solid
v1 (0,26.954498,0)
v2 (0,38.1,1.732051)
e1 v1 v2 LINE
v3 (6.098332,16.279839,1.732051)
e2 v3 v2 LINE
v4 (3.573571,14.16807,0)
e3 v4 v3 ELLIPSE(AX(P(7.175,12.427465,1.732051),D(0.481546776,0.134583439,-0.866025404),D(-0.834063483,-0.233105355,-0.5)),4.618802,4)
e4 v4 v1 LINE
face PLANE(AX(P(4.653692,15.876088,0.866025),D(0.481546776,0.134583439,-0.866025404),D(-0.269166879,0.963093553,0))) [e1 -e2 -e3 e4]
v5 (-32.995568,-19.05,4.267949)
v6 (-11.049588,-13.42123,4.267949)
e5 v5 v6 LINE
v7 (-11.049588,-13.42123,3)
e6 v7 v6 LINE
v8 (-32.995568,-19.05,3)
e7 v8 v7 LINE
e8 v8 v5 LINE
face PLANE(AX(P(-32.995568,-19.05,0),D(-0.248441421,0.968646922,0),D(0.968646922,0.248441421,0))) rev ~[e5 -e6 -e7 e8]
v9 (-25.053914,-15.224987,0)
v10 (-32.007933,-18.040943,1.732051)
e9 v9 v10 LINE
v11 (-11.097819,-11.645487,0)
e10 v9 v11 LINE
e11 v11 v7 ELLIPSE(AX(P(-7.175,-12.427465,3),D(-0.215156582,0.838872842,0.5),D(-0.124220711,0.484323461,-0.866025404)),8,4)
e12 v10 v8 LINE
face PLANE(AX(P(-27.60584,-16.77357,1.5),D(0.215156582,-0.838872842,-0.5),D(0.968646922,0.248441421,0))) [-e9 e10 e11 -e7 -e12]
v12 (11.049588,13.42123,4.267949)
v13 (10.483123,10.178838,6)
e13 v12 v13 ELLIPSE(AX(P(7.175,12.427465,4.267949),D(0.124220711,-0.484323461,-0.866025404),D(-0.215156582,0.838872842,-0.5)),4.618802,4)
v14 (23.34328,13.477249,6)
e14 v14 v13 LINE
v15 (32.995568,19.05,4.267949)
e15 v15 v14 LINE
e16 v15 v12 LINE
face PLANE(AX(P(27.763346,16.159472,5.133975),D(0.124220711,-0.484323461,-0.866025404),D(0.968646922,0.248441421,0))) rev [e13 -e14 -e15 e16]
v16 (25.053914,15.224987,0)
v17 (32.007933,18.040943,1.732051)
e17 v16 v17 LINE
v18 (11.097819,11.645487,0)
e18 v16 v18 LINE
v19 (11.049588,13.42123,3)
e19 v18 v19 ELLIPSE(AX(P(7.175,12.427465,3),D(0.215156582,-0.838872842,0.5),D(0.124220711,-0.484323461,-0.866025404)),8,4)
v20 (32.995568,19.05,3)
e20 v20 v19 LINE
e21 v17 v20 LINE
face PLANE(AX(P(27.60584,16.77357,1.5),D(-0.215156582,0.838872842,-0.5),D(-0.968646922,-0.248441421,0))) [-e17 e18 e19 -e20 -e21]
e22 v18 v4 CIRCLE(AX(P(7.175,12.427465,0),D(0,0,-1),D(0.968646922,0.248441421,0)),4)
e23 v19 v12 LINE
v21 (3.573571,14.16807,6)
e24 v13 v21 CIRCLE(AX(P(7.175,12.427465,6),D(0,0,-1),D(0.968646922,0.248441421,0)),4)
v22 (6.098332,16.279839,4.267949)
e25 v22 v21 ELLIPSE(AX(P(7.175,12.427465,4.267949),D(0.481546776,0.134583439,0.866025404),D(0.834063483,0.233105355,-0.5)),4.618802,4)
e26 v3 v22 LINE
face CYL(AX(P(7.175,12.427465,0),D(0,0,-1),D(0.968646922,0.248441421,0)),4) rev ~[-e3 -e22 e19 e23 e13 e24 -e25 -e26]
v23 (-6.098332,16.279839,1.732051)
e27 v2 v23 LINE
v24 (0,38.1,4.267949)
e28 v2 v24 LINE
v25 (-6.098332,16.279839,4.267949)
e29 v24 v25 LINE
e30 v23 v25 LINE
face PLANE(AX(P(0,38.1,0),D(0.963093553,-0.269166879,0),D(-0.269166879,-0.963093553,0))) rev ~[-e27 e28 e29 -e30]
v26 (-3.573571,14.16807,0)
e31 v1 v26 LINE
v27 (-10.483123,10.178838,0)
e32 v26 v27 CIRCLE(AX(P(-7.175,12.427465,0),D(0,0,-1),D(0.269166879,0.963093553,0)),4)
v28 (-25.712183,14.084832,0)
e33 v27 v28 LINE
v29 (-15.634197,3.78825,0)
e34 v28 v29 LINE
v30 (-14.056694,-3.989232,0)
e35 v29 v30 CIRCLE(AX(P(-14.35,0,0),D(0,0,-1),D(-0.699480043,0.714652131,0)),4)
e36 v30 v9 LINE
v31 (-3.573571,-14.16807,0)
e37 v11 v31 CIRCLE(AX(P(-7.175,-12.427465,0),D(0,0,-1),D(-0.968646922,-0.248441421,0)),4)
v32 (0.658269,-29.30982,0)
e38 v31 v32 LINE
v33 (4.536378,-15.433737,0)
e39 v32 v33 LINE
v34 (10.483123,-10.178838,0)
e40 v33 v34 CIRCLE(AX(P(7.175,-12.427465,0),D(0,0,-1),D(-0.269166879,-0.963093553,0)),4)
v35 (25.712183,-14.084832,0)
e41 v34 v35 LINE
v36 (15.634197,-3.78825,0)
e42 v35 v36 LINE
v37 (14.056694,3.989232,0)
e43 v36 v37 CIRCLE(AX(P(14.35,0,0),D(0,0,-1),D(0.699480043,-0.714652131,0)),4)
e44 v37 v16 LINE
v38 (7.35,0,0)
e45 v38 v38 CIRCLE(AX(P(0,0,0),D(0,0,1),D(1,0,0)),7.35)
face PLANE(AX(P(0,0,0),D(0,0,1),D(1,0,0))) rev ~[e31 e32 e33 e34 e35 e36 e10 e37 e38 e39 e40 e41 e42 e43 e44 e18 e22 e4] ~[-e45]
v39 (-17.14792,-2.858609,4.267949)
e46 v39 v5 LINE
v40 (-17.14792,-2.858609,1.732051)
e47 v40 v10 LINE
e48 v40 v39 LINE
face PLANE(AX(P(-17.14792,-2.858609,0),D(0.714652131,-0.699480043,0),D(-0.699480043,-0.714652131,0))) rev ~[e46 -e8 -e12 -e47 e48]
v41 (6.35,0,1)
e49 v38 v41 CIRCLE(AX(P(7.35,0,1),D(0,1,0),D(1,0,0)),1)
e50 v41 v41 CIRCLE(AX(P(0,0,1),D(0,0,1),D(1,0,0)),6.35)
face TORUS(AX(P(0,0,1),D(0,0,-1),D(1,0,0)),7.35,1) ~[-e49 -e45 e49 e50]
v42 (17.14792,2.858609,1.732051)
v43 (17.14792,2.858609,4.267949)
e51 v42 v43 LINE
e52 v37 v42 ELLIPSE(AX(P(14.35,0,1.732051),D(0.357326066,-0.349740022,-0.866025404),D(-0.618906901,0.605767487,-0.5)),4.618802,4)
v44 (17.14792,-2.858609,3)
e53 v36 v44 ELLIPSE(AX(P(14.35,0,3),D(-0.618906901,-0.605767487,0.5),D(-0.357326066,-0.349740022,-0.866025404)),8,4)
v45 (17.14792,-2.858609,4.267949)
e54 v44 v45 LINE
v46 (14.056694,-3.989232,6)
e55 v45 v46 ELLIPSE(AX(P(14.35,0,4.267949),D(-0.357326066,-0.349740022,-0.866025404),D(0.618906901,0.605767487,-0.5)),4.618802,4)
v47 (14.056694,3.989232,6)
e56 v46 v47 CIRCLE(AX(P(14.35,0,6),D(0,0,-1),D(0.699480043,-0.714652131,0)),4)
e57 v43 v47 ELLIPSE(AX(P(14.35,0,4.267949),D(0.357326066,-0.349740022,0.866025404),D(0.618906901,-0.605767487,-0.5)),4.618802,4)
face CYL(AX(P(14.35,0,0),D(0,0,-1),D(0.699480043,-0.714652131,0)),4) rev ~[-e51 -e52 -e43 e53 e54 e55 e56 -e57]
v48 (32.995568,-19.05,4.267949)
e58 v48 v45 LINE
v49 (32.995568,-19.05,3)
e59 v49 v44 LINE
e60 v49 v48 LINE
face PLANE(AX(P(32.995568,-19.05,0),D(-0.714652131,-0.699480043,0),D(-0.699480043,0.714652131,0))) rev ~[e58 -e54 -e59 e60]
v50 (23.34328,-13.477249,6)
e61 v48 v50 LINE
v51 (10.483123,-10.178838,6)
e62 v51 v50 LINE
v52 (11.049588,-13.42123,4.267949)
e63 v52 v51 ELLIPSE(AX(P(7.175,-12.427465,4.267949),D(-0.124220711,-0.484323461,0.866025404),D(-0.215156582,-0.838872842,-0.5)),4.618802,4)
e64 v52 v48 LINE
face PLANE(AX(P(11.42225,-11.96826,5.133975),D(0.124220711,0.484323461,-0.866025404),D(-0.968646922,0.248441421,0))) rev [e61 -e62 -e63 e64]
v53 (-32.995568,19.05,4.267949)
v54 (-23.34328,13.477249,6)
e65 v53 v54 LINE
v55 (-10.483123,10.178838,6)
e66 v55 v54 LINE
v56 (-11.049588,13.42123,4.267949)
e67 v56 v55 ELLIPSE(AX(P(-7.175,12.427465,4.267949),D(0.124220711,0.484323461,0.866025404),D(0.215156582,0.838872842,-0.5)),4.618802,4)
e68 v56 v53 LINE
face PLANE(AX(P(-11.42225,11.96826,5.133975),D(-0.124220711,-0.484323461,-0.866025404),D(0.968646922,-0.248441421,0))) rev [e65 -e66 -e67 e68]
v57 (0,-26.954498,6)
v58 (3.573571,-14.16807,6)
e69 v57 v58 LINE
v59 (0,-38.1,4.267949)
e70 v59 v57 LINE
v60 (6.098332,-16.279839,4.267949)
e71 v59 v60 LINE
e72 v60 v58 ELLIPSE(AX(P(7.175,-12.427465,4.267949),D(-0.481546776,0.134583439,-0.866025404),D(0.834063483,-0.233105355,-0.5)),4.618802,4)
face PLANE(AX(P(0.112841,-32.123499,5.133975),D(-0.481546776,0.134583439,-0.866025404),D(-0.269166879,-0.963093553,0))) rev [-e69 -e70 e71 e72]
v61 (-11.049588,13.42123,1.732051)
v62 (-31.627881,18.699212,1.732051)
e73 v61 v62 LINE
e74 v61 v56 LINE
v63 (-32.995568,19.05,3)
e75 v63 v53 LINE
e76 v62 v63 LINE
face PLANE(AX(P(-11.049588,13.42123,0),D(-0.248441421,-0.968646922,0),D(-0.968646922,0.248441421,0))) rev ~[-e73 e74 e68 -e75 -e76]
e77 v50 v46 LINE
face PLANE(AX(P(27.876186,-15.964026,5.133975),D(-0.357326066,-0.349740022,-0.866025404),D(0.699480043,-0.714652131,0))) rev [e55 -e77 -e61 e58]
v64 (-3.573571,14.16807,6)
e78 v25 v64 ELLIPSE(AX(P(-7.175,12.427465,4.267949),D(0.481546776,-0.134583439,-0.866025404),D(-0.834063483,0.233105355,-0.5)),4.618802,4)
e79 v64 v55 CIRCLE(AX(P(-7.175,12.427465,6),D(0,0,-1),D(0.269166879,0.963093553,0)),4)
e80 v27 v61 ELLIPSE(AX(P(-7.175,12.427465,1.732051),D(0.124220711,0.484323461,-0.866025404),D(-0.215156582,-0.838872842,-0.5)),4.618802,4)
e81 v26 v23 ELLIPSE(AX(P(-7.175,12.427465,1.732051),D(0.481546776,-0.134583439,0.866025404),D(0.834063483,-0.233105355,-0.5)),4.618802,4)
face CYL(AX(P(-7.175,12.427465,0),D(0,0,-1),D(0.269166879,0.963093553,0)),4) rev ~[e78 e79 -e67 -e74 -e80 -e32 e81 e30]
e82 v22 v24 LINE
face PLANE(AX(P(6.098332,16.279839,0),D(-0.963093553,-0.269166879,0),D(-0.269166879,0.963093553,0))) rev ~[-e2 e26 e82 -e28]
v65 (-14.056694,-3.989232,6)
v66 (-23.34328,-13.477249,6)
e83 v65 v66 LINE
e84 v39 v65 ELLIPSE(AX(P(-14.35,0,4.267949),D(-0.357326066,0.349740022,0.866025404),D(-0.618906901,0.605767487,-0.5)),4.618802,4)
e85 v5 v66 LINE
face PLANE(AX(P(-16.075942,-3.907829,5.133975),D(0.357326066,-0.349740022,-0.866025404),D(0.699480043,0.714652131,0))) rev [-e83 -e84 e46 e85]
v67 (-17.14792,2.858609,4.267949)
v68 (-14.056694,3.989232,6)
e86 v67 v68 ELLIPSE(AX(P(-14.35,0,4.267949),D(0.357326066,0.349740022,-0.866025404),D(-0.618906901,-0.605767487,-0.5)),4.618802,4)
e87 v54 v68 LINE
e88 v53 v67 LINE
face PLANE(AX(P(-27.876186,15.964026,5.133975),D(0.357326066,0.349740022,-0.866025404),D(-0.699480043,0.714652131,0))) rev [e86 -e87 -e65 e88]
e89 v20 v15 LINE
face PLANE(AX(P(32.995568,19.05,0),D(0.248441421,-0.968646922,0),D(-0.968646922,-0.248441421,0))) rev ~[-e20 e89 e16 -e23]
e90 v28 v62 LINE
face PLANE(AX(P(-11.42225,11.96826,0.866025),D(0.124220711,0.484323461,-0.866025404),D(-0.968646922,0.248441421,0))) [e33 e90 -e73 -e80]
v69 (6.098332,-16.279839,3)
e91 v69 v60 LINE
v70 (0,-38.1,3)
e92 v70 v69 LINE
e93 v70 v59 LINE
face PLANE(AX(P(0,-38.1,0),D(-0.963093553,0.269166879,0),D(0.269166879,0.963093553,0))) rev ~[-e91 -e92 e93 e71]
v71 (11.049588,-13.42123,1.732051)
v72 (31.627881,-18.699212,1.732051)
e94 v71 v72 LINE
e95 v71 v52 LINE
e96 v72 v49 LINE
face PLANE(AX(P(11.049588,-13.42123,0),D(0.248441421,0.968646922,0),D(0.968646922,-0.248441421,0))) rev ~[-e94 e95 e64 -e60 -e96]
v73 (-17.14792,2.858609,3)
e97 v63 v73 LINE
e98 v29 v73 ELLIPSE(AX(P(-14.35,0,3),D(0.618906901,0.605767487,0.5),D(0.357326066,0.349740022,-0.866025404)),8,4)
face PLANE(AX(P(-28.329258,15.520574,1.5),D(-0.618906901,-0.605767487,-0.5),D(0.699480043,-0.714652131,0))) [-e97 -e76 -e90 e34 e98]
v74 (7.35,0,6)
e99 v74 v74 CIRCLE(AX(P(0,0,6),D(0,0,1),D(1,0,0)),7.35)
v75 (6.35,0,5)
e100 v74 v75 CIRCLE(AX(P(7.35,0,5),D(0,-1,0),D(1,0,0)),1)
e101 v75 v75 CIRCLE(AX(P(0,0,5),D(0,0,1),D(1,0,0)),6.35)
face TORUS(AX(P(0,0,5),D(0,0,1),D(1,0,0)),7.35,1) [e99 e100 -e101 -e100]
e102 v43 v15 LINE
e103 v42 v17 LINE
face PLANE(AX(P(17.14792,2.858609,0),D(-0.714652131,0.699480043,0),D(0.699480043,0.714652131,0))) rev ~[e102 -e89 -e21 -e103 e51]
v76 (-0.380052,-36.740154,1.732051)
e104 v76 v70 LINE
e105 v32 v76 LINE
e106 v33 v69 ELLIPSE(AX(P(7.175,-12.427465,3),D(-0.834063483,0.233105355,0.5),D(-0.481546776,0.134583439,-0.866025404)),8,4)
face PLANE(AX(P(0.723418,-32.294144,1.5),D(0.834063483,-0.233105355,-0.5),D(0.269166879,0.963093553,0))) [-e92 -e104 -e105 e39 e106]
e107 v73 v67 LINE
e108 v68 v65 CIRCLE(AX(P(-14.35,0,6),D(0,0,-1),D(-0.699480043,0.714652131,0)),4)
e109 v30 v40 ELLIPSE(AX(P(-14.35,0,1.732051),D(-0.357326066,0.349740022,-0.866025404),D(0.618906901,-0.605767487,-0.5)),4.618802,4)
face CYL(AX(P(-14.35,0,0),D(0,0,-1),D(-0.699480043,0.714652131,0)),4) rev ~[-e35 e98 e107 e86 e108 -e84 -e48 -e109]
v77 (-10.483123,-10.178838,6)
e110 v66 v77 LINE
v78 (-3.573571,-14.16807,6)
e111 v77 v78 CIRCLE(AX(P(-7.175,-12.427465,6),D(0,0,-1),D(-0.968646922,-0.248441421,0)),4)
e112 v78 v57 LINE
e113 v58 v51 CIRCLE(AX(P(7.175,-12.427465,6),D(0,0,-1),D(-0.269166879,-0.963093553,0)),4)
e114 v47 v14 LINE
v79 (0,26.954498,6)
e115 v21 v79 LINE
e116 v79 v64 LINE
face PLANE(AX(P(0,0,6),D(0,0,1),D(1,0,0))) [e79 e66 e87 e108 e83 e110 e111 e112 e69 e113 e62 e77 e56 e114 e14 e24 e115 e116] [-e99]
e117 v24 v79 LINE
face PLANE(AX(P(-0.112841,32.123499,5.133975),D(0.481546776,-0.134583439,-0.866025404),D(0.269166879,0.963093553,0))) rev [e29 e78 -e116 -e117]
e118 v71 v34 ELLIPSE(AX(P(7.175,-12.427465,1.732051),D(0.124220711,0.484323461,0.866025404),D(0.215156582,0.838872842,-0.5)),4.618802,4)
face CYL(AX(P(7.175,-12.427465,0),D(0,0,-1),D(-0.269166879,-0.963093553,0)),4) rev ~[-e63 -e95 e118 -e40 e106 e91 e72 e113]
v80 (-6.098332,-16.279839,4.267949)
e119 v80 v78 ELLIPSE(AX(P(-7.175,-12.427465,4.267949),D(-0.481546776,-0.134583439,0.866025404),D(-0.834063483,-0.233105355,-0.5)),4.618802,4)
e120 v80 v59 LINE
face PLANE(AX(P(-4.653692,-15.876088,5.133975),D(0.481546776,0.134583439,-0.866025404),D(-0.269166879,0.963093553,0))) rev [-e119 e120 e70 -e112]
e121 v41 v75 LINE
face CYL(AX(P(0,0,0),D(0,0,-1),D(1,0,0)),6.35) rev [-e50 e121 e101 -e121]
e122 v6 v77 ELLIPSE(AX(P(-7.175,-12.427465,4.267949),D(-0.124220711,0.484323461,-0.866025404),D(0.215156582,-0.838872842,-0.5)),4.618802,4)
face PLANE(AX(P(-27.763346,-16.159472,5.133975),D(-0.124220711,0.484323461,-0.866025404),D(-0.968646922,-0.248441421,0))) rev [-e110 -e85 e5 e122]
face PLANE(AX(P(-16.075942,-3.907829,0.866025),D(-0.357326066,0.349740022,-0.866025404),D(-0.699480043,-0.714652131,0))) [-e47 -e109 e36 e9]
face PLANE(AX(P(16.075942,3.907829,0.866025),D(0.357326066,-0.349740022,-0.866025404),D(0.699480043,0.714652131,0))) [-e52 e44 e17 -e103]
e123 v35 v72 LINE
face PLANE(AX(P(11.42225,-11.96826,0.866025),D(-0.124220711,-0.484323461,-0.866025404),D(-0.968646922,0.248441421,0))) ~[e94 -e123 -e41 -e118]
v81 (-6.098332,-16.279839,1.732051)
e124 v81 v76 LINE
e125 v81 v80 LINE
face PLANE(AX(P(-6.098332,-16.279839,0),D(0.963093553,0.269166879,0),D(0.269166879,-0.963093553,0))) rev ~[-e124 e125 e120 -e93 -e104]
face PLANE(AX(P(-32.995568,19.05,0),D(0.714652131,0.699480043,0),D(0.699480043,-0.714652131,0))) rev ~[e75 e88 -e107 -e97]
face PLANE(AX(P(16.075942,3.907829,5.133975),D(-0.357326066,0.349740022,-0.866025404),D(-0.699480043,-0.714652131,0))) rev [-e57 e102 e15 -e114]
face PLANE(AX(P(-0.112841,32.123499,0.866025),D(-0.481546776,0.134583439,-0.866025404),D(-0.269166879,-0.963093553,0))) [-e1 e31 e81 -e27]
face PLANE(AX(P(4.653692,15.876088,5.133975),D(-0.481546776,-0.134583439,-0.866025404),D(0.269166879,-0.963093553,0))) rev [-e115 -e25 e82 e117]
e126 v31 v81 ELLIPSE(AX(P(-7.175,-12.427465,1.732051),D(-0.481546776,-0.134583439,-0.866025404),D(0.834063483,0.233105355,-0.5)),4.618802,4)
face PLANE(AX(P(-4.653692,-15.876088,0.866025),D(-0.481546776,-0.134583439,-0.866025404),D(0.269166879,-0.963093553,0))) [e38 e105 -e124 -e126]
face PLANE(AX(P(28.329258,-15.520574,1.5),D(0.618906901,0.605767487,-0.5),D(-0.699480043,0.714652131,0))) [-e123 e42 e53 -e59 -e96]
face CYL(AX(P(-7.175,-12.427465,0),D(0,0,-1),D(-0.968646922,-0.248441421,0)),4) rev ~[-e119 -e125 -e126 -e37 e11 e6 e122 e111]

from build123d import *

# Parameters (mm, degrees)
F0_R         = 6.35
F1_DEPTH     = 6
F2_C1_SIZE2  = 3
F2_C1_SIZE   = 1.7320508076
F2_C2_SIZE2  = 3
F2_C2_SIZE   = 1.7320508076
F2_C3_SIZE2  = 3
F2_C3_SIZE   = 1.7320508076
F2_C4_SIZE2  = 3
F2_C4_SIZE   = 1.7320508076
F2_C5_SIZE2  = 1.7320508076
F2_C5_SIZE   = 3
F2_C6_SIZE2  = 3
F2_C6_SIZE   = 1.7320508076
F2_C7_SIZE2  = 3
F2_C7_SIZE   = 1.7320508076
F2_C8_SIZE2  = 3
F2_C8_SIZE   = 1.7320508076
F2_C9_SIZE2  = 1.7320508076
F2_C9_SIZE   = 3
F2_C10_SIZE2 = 3
F2_C10_SIZE  = 1.7320508076
F2_C11_SIZE2 = 1.7320508076
F2_C11_SIZE  = 3
F2_C12_SIZE2 = 3
F2_C12_SIZE  = 1.7320508076
F2_C13_SIZE2 = 1.7320508076
F2_C13_SIZE  = 3
F2_C14_SIZE2 = 3
F2_C14_SIZE  = 1.7320508076
F2_C15_SIZE2 = 3
F2_C15_SIZE  = 1.7320508076
F2_C16_SIZE2 = 3
F2_C16_SIZE  = 1.7320508076
F2_C17_SIZE2 = 1.7320508076
F2_C17_SIZE  = 3
F2_C18_SIZE2 = 3
F2_C18_SIZE  = 1.7320508076
F2_C19_SIZE2 = 3
F2_C19_SIZE  = 1.7320508076
F2_C20_SIZE2 = 3
F2_C20_SIZE  = 1.7320508076
F2_C21_SIZE2 = 1.7320508076
F2_C21_SIZE  = 3
F2_C22_SIZE2 = 3
F2_C22_SIZE  = 1.7320508076
F2_C23_SIZE2 = 3
F2_C23_SIZE  = 1.7320508076
F2_C24_SIZE2 = 3
F2_C24_SIZE  = 1.7320508076
F3_R         = 1


with BuildPart() as f1:
    # F0 (on Top) → F1 (new body)
    with BuildSketch(Plane.XY):
        with BuildLine():
            Line((6.0983324846, 16.2798387553), (0, 38.1))
            Line((0, 38.1), (-6.0983324846, 16.2798387553))
            ThreePointArc((-6.0983324846, 16.2798387553), (-5.175, 8.9633629292), (-11.0495876893, 13.42123023))
            Line((-11.0495876893, 13.42123023), (-32.9955678842, 19.05))
            Line((-32.9955678842, 19.05), (-17.1479201739, 2.8586085253))
            ThreePointArc((-17.1479201739, 2.8586085253), (-10.35, 0), (-17.1479201739, -2.8586085253))
            Line((-17.1479201739, -2.8586085253), (-32.9955678842, -19.05))
            Line((-32.9955678842, -19.05), (-11.0495876893, -13.42123023))
            ThreePointArc((-11.0495876893, -13.42123023), (-5.175, -8.9633629292), (-6.0983324846, -16.2798387553))
            Line((-6.0983324846, -16.2798387553), (0, -38.1))
            Line((0, -38.1), (6.0983324846, -16.2798387553))
            ThreePointArc((6.0983324846, -16.2798387553), (5.175, -8.9633629292), (11.0495876893, -13.42123023))
            Line((11.0495876893, -13.42123023), (32.9955678842, -19.05))
            Line((32.9955678842, -19.05), (17.1479201739, -2.8586085253))
            ThreePointArc((17.1479201739, -2.8586085253), (10.35, 0), (17.1479201739, 2.8586085253))
            Line((17.1479201739, 2.8586085253), (32.9955678842, 19.05))
            Line((32.9955678842, 19.05), (11.0495876893, 13.42123023))
            ThreePointArc((11.0495876893, 13.42123023), (5.175, 8.9633629292), (6.0983324846, 16.2798387553))
        make_face()
        Circle(F0_R, mode=Mode.SUBTRACT)
    extrude(amount=F1_DEPTH)

    # F2: chamfer of 3 x 1.7320508076 on 24 edges, made by hand

    # F2_c1
    f2_c1_edges = [f1.edges().sort_by_distance(p)[0] for p in [
        (22.0225777867, -16.235615115, 0),
    ]]
    f2_c1_side = f1.faces().sort_by_distance((22.0225777867, -16.235615115, 0.0346410162))[0]
    chamfer(f2_c1_edges, length=F2_C1_SIZE, length2=F2_C1_SIZE2, reference=f2_c1_side)

    # F2_c2
    f2_c2_edges = [f1.edges().sort_by_distance(p)[0] for p in [
        (22.0225777867, -16.235615115, 6),
    ]]
    f2_c2_side = f1.faces().sort_by_distance((22.0225777867, -16.235615115, 5.9653589838))[0]
    chamfer(f2_c2_edges, length=F2_C2_SIZE, length2=F2_C2_SIZE2, reference=f2_c2_side)

    # F2_c3
    f2_c3_edges = [f1.edges().sort_by_distance(p)[0] for p in [
        (23.0480423242, -8.8867074098, 0),
    ]]
    f2_c3_side = f1.faces().sort_by_distance((23.0232860482, -8.9109381093, 0))[0]
    chamfer(f2_c3_edges, length=F2_C3_SIZE, length2=F2_C3_SIZE2, reference=f2_c3_side)

    # F2_c4
    f2_c4_edges = [f1.edges().sort_by_distance(p)[0] for p in [
        (23.0480423242, -8.8867074098, 6),
    ]]
    f2_c4_side = f1.faces().sort_by_distance((23.0480423242, -8.8867074098, 5.9653589838))[0]
    chamfer(f2_c4_edges, length=F2_C4_SIZE, length2=F2_C4_SIZE2, reference=f2_c4_side)

    # F2_c5
    f2_c5_edges = [f1.edges().sort_by_distance(p)[0] for p in [
        (25.071744029, 10.9543042626, 0),
    ]]
    f2_c5_side = f1.faces().sort_by_distance((25.046987753, 10.9785349621, 0))[0]
    chamfer(f2_c5_edges, length=F2_C5_SIZE, length2=F2_C5_SIZE2, reference=f2_c5_side)

    # F2_c6
    f2_c6_edges = [f1.edges().sort_by_distance(p)[0] for p in [
        (25.071744029, 10.9543042626, 6),
    ]]
    f2_c6_side = f1.faces().sort_by_distance((25.071744029, 10.9543042626, 5.9653589838))[0]
    chamfer(f2_c6_edges, length=F2_C6_SIZE, length2=F2_C6_SIZE2, reference=f2_c6_side)

    # F2_c7
    f2_c7_edges = [f1.edges().sort_by_distance(p)[0] for p in [
        (19.220135535, 15.5168364554, 0),
    ]]
    f2_c7_side = f1.faces().sort_by_distance((19.2287417983, 15.4832815417, 0))[0]
    chamfer(f2_c7_edges, length=F2_C7_SIZE, length2=F2_C7_SIZE2, reference=f2_c7_side)

    # F2_c8
    f2_c8_edges = [f1.edges().sort_by_distance(p)[0] for p in [
        (19.220135535, 15.5168364554, 6),
    ]]
    f2_c8_side = f1.faces().sort_by_distance((19.220135535, 15.5168364554, 5.9653589838))[0]
    chamfer(f2_c8_edges, length=F2_C8_SIZE, length2=F2_C8_SIZE2, reference=f2_c8_side)

    # F2_c9
    f2_c9_edges = [f1.edges().sort_by_distance(p)[0] for p in [
        (3.0491662423, 27.1899193776, 0),
    ]]
    f2_c9_side = f1.faces().sort_by_distance((3.015803703, 27.1805951634, 0))[0]
    chamfer(f2_c9_edges, length=F2_C9_SIZE, length2=F2_C9_SIZE2, reference=f2_c9_side)

    # F2_c10
    f2_c10_edges = [f1.edges().sort_by_distance(p)[0] for p in [
        (3.0491662423, 27.1899193776, 6),
    ]]
    f2_c10_side = f1.faces().sort_by_distance((3.0491662423, 27.1899193776, 5.9653589838))[0]
    chamfer(f2_c10_edges, length=F2_C10_SIZE, length2=F2_C10_SIZE2, reference=f2_c10_side)

    # F2_c11
    f2_c11_edges = [f1.edges().sort_by_distance(p)[0] for p in [
        (-3.8279067892, 24.4035438652, 0),
    ]]
    f2_c11_side = f1.faces().sort_by_distance((-3.7945442499, 24.394219651, 0))[0]
    chamfer(f2_c11_edges, length=F2_C11_SIZE, length2=F2_C11_SIZE2, reference=f2_c11_side)

    # F2_c12
    f2_c12_edges = [f1.edges().sort_by_distance(p)[0] for p in [
        (-3.8279067892, 24.4035438652, 6),
    ]]
    f2_c12_side = f1.faces().sort_by_distance((-3.8279067892, 24.4035438652, 5.9653589838))[0]
    chamfer(f2_c12_edges, length=F2_C12_SIZE, length2=F2_C12_SIZE2, reference=f2_c12_side)

    # F2_c13
    f2_c13_edges = [f1.edges().sort_by_distance(p)[0] for p in [
        (-22.0225777867, 16.235615115, 0),
    ]]
    f2_c13_side = f1.faces().sort_by_distance((-22.03118405, 16.2020602013, 0))[0]
    chamfer(f2_c13_edges, length=F2_C13_SIZE, length2=F2_C13_SIZE2, reference=f2_c13_side)

    # F2_c14
    f2_c14_edges = [f1.edges().sort_by_distance(p)[0] for p in [
        (-22.0225777867, 16.235615115, 6),
    ]]
    f2_c14_side = f1.faces().sort_by_distance((-22.0225777867, 16.235615115, 5.9653589838))[0]
    chamfer(f2_c14_edges, length=F2_C14_SIZE, length2=F2_C14_SIZE2, reference=f2_c14_side)

    # F2_c15
    f2_c15_edges = [f1.edges().sort_by_distance(p)[0] for p in [
        (-23.0480423242, 8.8867074098, 0),
    ]]
    f2_c15_side = f1.faces().sort_by_distance((-23.0232860482, 8.9109381093, 0))[0]
    chamfer(f2_c15_edges, length=F2_C15_SIZE, length2=F2_C15_SIZE2, reference=f2_c15_side)

    # F2_c16
    f2_c16_edges = [f1.edges().sort_by_distance(p)[0] for p in [
        (-23.0480423242, 8.8867074098, 6),
    ]]
    f2_c16_side = f1.faces().sort_by_distance((-23.0480423242, 8.8867074098, 5.9653589838))[0]
    chamfer(f2_c16_edges, length=F2_C16_SIZE, length2=F2_C16_SIZE2, reference=f2_c16_side)

    # F2_c17
    f2_c17_edges = [f1.edges().sort_by_distance(p)[0] for p in [
        (-25.071744029, -10.9543042626, 0),
    ]]
    f2_c17_side = f1.faces().sort_by_distance((-25.046987753, -10.9785349621, 0))[0]
    chamfer(f2_c17_edges, length=F2_C17_SIZE, length2=F2_C17_SIZE2, reference=f2_c17_side)

    # F2_c18
    f2_c18_edges = [f1.edges().sort_by_distance(p)[0] for p in [
        (-25.071744029, -10.9543042626, 6),
    ]]
    f2_c18_side = f1.faces().sort_by_distance((-25.071744029, -10.9543042626, 5.9653589838))[0]
    chamfer(f2_c18_edges, length=F2_C18_SIZE, length2=F2_C18_SIZE2, reference=f2_c18_side)

    # F2_c19
    f2_c19_edges = [f1.edges().sort_by_distance(p)[0] for p in [
        (-19.220135535, -15.5168364554, 0),
    ]]
    f2_c19_side = f1.faces().sort_by_distance((-19.2287417983, -15.4832815417, 0))[0]
    chamfer(f2_c19_edges, length=F2_C19_SIZE, length2=F2_C19_SIZE2, reference=f2_c19_side)

    # F2_c20
    f2_c20_edges = [f1.edges().sort_by_distance(p)[0] for p in [
        (-19.220135535, -15.5168364554, 6),
    ]]
    f2_c20_side = f1.faces().sort_by_distance((-19.220135535, -15.5168364554, 5.9653589838))[0]
    chamfer(f2_c20_edges, length=F2_C20_SIZE, length2=F2_C20_SIZE2, reference=f2_c20_side)

    # F2_c21
    f2_c21_edges = [f1.edges().sort_by_distance(p)[0] for p in [
        (-3.0491662423, -27.1899193776, 0),
    ]]
    f2_c21_side = f1.faces().sort_by_distance((-3.015803703, -27.1805951634, 0))[0]
    chamfer(f2_c21_edges, length=F2_C21_SIZE, length2=F2_C21_SIZE2, reference=f2_c21_side)

    # F2_c22
    f2_c22_edges = [f1.edges().sort_by_distance(p)[0] for p in [
        (-3.0491662423, -27.1899193776, 6),
    ]]
    f2_c22_side = f1.faces().sort_by_distance((-3.0491662423, -27.1899193776, 5.9653589838))[0]
    chamfer(f2_c22_edges, length=F2_C22_SIZE, length2=F2_C22_SIZE2, reference=f2_c22_side)

    # F2_c23
    f2_c23_edges = [f1.edges().sort_by_distance(p)[0] for p in [
        (3.8279067892, -24.4035438652, 0),
    ]]
    f2_c23_side = f1.faces().sort_by_distance((3.7945442499, -24.394219651, 0))[0]
    chamfer(f2_c23_edges, length=F2_C23_SIZE, length2=F2_C23_SIZE2, reference=f2_c23_side)

    # F2_c24
    f2_c24_edges = [f1.edges().sort_by_distance(p)[0] for p in [
        (3.8279067892, -24.4035438652, 6),
    ]]
    f2_c24_side = f1.faces().sort_by_distance((3.8279067892, -24.4035438652, 5.9653589838))[0]
    chamfer(f2_c24_edges, length=F2_C24_SIZE, length2=F2_C24_SIZE2, reference=f2_c24_side)

    # F3
    f3_edges = [f1.edges().sort_by_distance(p)[0] for p in [
        (-6.35, 0, 0),
        (-6.35, 0, 6),
    ]]
    fillet(f3_edges, radius=F3_R)


solid = f1.part
